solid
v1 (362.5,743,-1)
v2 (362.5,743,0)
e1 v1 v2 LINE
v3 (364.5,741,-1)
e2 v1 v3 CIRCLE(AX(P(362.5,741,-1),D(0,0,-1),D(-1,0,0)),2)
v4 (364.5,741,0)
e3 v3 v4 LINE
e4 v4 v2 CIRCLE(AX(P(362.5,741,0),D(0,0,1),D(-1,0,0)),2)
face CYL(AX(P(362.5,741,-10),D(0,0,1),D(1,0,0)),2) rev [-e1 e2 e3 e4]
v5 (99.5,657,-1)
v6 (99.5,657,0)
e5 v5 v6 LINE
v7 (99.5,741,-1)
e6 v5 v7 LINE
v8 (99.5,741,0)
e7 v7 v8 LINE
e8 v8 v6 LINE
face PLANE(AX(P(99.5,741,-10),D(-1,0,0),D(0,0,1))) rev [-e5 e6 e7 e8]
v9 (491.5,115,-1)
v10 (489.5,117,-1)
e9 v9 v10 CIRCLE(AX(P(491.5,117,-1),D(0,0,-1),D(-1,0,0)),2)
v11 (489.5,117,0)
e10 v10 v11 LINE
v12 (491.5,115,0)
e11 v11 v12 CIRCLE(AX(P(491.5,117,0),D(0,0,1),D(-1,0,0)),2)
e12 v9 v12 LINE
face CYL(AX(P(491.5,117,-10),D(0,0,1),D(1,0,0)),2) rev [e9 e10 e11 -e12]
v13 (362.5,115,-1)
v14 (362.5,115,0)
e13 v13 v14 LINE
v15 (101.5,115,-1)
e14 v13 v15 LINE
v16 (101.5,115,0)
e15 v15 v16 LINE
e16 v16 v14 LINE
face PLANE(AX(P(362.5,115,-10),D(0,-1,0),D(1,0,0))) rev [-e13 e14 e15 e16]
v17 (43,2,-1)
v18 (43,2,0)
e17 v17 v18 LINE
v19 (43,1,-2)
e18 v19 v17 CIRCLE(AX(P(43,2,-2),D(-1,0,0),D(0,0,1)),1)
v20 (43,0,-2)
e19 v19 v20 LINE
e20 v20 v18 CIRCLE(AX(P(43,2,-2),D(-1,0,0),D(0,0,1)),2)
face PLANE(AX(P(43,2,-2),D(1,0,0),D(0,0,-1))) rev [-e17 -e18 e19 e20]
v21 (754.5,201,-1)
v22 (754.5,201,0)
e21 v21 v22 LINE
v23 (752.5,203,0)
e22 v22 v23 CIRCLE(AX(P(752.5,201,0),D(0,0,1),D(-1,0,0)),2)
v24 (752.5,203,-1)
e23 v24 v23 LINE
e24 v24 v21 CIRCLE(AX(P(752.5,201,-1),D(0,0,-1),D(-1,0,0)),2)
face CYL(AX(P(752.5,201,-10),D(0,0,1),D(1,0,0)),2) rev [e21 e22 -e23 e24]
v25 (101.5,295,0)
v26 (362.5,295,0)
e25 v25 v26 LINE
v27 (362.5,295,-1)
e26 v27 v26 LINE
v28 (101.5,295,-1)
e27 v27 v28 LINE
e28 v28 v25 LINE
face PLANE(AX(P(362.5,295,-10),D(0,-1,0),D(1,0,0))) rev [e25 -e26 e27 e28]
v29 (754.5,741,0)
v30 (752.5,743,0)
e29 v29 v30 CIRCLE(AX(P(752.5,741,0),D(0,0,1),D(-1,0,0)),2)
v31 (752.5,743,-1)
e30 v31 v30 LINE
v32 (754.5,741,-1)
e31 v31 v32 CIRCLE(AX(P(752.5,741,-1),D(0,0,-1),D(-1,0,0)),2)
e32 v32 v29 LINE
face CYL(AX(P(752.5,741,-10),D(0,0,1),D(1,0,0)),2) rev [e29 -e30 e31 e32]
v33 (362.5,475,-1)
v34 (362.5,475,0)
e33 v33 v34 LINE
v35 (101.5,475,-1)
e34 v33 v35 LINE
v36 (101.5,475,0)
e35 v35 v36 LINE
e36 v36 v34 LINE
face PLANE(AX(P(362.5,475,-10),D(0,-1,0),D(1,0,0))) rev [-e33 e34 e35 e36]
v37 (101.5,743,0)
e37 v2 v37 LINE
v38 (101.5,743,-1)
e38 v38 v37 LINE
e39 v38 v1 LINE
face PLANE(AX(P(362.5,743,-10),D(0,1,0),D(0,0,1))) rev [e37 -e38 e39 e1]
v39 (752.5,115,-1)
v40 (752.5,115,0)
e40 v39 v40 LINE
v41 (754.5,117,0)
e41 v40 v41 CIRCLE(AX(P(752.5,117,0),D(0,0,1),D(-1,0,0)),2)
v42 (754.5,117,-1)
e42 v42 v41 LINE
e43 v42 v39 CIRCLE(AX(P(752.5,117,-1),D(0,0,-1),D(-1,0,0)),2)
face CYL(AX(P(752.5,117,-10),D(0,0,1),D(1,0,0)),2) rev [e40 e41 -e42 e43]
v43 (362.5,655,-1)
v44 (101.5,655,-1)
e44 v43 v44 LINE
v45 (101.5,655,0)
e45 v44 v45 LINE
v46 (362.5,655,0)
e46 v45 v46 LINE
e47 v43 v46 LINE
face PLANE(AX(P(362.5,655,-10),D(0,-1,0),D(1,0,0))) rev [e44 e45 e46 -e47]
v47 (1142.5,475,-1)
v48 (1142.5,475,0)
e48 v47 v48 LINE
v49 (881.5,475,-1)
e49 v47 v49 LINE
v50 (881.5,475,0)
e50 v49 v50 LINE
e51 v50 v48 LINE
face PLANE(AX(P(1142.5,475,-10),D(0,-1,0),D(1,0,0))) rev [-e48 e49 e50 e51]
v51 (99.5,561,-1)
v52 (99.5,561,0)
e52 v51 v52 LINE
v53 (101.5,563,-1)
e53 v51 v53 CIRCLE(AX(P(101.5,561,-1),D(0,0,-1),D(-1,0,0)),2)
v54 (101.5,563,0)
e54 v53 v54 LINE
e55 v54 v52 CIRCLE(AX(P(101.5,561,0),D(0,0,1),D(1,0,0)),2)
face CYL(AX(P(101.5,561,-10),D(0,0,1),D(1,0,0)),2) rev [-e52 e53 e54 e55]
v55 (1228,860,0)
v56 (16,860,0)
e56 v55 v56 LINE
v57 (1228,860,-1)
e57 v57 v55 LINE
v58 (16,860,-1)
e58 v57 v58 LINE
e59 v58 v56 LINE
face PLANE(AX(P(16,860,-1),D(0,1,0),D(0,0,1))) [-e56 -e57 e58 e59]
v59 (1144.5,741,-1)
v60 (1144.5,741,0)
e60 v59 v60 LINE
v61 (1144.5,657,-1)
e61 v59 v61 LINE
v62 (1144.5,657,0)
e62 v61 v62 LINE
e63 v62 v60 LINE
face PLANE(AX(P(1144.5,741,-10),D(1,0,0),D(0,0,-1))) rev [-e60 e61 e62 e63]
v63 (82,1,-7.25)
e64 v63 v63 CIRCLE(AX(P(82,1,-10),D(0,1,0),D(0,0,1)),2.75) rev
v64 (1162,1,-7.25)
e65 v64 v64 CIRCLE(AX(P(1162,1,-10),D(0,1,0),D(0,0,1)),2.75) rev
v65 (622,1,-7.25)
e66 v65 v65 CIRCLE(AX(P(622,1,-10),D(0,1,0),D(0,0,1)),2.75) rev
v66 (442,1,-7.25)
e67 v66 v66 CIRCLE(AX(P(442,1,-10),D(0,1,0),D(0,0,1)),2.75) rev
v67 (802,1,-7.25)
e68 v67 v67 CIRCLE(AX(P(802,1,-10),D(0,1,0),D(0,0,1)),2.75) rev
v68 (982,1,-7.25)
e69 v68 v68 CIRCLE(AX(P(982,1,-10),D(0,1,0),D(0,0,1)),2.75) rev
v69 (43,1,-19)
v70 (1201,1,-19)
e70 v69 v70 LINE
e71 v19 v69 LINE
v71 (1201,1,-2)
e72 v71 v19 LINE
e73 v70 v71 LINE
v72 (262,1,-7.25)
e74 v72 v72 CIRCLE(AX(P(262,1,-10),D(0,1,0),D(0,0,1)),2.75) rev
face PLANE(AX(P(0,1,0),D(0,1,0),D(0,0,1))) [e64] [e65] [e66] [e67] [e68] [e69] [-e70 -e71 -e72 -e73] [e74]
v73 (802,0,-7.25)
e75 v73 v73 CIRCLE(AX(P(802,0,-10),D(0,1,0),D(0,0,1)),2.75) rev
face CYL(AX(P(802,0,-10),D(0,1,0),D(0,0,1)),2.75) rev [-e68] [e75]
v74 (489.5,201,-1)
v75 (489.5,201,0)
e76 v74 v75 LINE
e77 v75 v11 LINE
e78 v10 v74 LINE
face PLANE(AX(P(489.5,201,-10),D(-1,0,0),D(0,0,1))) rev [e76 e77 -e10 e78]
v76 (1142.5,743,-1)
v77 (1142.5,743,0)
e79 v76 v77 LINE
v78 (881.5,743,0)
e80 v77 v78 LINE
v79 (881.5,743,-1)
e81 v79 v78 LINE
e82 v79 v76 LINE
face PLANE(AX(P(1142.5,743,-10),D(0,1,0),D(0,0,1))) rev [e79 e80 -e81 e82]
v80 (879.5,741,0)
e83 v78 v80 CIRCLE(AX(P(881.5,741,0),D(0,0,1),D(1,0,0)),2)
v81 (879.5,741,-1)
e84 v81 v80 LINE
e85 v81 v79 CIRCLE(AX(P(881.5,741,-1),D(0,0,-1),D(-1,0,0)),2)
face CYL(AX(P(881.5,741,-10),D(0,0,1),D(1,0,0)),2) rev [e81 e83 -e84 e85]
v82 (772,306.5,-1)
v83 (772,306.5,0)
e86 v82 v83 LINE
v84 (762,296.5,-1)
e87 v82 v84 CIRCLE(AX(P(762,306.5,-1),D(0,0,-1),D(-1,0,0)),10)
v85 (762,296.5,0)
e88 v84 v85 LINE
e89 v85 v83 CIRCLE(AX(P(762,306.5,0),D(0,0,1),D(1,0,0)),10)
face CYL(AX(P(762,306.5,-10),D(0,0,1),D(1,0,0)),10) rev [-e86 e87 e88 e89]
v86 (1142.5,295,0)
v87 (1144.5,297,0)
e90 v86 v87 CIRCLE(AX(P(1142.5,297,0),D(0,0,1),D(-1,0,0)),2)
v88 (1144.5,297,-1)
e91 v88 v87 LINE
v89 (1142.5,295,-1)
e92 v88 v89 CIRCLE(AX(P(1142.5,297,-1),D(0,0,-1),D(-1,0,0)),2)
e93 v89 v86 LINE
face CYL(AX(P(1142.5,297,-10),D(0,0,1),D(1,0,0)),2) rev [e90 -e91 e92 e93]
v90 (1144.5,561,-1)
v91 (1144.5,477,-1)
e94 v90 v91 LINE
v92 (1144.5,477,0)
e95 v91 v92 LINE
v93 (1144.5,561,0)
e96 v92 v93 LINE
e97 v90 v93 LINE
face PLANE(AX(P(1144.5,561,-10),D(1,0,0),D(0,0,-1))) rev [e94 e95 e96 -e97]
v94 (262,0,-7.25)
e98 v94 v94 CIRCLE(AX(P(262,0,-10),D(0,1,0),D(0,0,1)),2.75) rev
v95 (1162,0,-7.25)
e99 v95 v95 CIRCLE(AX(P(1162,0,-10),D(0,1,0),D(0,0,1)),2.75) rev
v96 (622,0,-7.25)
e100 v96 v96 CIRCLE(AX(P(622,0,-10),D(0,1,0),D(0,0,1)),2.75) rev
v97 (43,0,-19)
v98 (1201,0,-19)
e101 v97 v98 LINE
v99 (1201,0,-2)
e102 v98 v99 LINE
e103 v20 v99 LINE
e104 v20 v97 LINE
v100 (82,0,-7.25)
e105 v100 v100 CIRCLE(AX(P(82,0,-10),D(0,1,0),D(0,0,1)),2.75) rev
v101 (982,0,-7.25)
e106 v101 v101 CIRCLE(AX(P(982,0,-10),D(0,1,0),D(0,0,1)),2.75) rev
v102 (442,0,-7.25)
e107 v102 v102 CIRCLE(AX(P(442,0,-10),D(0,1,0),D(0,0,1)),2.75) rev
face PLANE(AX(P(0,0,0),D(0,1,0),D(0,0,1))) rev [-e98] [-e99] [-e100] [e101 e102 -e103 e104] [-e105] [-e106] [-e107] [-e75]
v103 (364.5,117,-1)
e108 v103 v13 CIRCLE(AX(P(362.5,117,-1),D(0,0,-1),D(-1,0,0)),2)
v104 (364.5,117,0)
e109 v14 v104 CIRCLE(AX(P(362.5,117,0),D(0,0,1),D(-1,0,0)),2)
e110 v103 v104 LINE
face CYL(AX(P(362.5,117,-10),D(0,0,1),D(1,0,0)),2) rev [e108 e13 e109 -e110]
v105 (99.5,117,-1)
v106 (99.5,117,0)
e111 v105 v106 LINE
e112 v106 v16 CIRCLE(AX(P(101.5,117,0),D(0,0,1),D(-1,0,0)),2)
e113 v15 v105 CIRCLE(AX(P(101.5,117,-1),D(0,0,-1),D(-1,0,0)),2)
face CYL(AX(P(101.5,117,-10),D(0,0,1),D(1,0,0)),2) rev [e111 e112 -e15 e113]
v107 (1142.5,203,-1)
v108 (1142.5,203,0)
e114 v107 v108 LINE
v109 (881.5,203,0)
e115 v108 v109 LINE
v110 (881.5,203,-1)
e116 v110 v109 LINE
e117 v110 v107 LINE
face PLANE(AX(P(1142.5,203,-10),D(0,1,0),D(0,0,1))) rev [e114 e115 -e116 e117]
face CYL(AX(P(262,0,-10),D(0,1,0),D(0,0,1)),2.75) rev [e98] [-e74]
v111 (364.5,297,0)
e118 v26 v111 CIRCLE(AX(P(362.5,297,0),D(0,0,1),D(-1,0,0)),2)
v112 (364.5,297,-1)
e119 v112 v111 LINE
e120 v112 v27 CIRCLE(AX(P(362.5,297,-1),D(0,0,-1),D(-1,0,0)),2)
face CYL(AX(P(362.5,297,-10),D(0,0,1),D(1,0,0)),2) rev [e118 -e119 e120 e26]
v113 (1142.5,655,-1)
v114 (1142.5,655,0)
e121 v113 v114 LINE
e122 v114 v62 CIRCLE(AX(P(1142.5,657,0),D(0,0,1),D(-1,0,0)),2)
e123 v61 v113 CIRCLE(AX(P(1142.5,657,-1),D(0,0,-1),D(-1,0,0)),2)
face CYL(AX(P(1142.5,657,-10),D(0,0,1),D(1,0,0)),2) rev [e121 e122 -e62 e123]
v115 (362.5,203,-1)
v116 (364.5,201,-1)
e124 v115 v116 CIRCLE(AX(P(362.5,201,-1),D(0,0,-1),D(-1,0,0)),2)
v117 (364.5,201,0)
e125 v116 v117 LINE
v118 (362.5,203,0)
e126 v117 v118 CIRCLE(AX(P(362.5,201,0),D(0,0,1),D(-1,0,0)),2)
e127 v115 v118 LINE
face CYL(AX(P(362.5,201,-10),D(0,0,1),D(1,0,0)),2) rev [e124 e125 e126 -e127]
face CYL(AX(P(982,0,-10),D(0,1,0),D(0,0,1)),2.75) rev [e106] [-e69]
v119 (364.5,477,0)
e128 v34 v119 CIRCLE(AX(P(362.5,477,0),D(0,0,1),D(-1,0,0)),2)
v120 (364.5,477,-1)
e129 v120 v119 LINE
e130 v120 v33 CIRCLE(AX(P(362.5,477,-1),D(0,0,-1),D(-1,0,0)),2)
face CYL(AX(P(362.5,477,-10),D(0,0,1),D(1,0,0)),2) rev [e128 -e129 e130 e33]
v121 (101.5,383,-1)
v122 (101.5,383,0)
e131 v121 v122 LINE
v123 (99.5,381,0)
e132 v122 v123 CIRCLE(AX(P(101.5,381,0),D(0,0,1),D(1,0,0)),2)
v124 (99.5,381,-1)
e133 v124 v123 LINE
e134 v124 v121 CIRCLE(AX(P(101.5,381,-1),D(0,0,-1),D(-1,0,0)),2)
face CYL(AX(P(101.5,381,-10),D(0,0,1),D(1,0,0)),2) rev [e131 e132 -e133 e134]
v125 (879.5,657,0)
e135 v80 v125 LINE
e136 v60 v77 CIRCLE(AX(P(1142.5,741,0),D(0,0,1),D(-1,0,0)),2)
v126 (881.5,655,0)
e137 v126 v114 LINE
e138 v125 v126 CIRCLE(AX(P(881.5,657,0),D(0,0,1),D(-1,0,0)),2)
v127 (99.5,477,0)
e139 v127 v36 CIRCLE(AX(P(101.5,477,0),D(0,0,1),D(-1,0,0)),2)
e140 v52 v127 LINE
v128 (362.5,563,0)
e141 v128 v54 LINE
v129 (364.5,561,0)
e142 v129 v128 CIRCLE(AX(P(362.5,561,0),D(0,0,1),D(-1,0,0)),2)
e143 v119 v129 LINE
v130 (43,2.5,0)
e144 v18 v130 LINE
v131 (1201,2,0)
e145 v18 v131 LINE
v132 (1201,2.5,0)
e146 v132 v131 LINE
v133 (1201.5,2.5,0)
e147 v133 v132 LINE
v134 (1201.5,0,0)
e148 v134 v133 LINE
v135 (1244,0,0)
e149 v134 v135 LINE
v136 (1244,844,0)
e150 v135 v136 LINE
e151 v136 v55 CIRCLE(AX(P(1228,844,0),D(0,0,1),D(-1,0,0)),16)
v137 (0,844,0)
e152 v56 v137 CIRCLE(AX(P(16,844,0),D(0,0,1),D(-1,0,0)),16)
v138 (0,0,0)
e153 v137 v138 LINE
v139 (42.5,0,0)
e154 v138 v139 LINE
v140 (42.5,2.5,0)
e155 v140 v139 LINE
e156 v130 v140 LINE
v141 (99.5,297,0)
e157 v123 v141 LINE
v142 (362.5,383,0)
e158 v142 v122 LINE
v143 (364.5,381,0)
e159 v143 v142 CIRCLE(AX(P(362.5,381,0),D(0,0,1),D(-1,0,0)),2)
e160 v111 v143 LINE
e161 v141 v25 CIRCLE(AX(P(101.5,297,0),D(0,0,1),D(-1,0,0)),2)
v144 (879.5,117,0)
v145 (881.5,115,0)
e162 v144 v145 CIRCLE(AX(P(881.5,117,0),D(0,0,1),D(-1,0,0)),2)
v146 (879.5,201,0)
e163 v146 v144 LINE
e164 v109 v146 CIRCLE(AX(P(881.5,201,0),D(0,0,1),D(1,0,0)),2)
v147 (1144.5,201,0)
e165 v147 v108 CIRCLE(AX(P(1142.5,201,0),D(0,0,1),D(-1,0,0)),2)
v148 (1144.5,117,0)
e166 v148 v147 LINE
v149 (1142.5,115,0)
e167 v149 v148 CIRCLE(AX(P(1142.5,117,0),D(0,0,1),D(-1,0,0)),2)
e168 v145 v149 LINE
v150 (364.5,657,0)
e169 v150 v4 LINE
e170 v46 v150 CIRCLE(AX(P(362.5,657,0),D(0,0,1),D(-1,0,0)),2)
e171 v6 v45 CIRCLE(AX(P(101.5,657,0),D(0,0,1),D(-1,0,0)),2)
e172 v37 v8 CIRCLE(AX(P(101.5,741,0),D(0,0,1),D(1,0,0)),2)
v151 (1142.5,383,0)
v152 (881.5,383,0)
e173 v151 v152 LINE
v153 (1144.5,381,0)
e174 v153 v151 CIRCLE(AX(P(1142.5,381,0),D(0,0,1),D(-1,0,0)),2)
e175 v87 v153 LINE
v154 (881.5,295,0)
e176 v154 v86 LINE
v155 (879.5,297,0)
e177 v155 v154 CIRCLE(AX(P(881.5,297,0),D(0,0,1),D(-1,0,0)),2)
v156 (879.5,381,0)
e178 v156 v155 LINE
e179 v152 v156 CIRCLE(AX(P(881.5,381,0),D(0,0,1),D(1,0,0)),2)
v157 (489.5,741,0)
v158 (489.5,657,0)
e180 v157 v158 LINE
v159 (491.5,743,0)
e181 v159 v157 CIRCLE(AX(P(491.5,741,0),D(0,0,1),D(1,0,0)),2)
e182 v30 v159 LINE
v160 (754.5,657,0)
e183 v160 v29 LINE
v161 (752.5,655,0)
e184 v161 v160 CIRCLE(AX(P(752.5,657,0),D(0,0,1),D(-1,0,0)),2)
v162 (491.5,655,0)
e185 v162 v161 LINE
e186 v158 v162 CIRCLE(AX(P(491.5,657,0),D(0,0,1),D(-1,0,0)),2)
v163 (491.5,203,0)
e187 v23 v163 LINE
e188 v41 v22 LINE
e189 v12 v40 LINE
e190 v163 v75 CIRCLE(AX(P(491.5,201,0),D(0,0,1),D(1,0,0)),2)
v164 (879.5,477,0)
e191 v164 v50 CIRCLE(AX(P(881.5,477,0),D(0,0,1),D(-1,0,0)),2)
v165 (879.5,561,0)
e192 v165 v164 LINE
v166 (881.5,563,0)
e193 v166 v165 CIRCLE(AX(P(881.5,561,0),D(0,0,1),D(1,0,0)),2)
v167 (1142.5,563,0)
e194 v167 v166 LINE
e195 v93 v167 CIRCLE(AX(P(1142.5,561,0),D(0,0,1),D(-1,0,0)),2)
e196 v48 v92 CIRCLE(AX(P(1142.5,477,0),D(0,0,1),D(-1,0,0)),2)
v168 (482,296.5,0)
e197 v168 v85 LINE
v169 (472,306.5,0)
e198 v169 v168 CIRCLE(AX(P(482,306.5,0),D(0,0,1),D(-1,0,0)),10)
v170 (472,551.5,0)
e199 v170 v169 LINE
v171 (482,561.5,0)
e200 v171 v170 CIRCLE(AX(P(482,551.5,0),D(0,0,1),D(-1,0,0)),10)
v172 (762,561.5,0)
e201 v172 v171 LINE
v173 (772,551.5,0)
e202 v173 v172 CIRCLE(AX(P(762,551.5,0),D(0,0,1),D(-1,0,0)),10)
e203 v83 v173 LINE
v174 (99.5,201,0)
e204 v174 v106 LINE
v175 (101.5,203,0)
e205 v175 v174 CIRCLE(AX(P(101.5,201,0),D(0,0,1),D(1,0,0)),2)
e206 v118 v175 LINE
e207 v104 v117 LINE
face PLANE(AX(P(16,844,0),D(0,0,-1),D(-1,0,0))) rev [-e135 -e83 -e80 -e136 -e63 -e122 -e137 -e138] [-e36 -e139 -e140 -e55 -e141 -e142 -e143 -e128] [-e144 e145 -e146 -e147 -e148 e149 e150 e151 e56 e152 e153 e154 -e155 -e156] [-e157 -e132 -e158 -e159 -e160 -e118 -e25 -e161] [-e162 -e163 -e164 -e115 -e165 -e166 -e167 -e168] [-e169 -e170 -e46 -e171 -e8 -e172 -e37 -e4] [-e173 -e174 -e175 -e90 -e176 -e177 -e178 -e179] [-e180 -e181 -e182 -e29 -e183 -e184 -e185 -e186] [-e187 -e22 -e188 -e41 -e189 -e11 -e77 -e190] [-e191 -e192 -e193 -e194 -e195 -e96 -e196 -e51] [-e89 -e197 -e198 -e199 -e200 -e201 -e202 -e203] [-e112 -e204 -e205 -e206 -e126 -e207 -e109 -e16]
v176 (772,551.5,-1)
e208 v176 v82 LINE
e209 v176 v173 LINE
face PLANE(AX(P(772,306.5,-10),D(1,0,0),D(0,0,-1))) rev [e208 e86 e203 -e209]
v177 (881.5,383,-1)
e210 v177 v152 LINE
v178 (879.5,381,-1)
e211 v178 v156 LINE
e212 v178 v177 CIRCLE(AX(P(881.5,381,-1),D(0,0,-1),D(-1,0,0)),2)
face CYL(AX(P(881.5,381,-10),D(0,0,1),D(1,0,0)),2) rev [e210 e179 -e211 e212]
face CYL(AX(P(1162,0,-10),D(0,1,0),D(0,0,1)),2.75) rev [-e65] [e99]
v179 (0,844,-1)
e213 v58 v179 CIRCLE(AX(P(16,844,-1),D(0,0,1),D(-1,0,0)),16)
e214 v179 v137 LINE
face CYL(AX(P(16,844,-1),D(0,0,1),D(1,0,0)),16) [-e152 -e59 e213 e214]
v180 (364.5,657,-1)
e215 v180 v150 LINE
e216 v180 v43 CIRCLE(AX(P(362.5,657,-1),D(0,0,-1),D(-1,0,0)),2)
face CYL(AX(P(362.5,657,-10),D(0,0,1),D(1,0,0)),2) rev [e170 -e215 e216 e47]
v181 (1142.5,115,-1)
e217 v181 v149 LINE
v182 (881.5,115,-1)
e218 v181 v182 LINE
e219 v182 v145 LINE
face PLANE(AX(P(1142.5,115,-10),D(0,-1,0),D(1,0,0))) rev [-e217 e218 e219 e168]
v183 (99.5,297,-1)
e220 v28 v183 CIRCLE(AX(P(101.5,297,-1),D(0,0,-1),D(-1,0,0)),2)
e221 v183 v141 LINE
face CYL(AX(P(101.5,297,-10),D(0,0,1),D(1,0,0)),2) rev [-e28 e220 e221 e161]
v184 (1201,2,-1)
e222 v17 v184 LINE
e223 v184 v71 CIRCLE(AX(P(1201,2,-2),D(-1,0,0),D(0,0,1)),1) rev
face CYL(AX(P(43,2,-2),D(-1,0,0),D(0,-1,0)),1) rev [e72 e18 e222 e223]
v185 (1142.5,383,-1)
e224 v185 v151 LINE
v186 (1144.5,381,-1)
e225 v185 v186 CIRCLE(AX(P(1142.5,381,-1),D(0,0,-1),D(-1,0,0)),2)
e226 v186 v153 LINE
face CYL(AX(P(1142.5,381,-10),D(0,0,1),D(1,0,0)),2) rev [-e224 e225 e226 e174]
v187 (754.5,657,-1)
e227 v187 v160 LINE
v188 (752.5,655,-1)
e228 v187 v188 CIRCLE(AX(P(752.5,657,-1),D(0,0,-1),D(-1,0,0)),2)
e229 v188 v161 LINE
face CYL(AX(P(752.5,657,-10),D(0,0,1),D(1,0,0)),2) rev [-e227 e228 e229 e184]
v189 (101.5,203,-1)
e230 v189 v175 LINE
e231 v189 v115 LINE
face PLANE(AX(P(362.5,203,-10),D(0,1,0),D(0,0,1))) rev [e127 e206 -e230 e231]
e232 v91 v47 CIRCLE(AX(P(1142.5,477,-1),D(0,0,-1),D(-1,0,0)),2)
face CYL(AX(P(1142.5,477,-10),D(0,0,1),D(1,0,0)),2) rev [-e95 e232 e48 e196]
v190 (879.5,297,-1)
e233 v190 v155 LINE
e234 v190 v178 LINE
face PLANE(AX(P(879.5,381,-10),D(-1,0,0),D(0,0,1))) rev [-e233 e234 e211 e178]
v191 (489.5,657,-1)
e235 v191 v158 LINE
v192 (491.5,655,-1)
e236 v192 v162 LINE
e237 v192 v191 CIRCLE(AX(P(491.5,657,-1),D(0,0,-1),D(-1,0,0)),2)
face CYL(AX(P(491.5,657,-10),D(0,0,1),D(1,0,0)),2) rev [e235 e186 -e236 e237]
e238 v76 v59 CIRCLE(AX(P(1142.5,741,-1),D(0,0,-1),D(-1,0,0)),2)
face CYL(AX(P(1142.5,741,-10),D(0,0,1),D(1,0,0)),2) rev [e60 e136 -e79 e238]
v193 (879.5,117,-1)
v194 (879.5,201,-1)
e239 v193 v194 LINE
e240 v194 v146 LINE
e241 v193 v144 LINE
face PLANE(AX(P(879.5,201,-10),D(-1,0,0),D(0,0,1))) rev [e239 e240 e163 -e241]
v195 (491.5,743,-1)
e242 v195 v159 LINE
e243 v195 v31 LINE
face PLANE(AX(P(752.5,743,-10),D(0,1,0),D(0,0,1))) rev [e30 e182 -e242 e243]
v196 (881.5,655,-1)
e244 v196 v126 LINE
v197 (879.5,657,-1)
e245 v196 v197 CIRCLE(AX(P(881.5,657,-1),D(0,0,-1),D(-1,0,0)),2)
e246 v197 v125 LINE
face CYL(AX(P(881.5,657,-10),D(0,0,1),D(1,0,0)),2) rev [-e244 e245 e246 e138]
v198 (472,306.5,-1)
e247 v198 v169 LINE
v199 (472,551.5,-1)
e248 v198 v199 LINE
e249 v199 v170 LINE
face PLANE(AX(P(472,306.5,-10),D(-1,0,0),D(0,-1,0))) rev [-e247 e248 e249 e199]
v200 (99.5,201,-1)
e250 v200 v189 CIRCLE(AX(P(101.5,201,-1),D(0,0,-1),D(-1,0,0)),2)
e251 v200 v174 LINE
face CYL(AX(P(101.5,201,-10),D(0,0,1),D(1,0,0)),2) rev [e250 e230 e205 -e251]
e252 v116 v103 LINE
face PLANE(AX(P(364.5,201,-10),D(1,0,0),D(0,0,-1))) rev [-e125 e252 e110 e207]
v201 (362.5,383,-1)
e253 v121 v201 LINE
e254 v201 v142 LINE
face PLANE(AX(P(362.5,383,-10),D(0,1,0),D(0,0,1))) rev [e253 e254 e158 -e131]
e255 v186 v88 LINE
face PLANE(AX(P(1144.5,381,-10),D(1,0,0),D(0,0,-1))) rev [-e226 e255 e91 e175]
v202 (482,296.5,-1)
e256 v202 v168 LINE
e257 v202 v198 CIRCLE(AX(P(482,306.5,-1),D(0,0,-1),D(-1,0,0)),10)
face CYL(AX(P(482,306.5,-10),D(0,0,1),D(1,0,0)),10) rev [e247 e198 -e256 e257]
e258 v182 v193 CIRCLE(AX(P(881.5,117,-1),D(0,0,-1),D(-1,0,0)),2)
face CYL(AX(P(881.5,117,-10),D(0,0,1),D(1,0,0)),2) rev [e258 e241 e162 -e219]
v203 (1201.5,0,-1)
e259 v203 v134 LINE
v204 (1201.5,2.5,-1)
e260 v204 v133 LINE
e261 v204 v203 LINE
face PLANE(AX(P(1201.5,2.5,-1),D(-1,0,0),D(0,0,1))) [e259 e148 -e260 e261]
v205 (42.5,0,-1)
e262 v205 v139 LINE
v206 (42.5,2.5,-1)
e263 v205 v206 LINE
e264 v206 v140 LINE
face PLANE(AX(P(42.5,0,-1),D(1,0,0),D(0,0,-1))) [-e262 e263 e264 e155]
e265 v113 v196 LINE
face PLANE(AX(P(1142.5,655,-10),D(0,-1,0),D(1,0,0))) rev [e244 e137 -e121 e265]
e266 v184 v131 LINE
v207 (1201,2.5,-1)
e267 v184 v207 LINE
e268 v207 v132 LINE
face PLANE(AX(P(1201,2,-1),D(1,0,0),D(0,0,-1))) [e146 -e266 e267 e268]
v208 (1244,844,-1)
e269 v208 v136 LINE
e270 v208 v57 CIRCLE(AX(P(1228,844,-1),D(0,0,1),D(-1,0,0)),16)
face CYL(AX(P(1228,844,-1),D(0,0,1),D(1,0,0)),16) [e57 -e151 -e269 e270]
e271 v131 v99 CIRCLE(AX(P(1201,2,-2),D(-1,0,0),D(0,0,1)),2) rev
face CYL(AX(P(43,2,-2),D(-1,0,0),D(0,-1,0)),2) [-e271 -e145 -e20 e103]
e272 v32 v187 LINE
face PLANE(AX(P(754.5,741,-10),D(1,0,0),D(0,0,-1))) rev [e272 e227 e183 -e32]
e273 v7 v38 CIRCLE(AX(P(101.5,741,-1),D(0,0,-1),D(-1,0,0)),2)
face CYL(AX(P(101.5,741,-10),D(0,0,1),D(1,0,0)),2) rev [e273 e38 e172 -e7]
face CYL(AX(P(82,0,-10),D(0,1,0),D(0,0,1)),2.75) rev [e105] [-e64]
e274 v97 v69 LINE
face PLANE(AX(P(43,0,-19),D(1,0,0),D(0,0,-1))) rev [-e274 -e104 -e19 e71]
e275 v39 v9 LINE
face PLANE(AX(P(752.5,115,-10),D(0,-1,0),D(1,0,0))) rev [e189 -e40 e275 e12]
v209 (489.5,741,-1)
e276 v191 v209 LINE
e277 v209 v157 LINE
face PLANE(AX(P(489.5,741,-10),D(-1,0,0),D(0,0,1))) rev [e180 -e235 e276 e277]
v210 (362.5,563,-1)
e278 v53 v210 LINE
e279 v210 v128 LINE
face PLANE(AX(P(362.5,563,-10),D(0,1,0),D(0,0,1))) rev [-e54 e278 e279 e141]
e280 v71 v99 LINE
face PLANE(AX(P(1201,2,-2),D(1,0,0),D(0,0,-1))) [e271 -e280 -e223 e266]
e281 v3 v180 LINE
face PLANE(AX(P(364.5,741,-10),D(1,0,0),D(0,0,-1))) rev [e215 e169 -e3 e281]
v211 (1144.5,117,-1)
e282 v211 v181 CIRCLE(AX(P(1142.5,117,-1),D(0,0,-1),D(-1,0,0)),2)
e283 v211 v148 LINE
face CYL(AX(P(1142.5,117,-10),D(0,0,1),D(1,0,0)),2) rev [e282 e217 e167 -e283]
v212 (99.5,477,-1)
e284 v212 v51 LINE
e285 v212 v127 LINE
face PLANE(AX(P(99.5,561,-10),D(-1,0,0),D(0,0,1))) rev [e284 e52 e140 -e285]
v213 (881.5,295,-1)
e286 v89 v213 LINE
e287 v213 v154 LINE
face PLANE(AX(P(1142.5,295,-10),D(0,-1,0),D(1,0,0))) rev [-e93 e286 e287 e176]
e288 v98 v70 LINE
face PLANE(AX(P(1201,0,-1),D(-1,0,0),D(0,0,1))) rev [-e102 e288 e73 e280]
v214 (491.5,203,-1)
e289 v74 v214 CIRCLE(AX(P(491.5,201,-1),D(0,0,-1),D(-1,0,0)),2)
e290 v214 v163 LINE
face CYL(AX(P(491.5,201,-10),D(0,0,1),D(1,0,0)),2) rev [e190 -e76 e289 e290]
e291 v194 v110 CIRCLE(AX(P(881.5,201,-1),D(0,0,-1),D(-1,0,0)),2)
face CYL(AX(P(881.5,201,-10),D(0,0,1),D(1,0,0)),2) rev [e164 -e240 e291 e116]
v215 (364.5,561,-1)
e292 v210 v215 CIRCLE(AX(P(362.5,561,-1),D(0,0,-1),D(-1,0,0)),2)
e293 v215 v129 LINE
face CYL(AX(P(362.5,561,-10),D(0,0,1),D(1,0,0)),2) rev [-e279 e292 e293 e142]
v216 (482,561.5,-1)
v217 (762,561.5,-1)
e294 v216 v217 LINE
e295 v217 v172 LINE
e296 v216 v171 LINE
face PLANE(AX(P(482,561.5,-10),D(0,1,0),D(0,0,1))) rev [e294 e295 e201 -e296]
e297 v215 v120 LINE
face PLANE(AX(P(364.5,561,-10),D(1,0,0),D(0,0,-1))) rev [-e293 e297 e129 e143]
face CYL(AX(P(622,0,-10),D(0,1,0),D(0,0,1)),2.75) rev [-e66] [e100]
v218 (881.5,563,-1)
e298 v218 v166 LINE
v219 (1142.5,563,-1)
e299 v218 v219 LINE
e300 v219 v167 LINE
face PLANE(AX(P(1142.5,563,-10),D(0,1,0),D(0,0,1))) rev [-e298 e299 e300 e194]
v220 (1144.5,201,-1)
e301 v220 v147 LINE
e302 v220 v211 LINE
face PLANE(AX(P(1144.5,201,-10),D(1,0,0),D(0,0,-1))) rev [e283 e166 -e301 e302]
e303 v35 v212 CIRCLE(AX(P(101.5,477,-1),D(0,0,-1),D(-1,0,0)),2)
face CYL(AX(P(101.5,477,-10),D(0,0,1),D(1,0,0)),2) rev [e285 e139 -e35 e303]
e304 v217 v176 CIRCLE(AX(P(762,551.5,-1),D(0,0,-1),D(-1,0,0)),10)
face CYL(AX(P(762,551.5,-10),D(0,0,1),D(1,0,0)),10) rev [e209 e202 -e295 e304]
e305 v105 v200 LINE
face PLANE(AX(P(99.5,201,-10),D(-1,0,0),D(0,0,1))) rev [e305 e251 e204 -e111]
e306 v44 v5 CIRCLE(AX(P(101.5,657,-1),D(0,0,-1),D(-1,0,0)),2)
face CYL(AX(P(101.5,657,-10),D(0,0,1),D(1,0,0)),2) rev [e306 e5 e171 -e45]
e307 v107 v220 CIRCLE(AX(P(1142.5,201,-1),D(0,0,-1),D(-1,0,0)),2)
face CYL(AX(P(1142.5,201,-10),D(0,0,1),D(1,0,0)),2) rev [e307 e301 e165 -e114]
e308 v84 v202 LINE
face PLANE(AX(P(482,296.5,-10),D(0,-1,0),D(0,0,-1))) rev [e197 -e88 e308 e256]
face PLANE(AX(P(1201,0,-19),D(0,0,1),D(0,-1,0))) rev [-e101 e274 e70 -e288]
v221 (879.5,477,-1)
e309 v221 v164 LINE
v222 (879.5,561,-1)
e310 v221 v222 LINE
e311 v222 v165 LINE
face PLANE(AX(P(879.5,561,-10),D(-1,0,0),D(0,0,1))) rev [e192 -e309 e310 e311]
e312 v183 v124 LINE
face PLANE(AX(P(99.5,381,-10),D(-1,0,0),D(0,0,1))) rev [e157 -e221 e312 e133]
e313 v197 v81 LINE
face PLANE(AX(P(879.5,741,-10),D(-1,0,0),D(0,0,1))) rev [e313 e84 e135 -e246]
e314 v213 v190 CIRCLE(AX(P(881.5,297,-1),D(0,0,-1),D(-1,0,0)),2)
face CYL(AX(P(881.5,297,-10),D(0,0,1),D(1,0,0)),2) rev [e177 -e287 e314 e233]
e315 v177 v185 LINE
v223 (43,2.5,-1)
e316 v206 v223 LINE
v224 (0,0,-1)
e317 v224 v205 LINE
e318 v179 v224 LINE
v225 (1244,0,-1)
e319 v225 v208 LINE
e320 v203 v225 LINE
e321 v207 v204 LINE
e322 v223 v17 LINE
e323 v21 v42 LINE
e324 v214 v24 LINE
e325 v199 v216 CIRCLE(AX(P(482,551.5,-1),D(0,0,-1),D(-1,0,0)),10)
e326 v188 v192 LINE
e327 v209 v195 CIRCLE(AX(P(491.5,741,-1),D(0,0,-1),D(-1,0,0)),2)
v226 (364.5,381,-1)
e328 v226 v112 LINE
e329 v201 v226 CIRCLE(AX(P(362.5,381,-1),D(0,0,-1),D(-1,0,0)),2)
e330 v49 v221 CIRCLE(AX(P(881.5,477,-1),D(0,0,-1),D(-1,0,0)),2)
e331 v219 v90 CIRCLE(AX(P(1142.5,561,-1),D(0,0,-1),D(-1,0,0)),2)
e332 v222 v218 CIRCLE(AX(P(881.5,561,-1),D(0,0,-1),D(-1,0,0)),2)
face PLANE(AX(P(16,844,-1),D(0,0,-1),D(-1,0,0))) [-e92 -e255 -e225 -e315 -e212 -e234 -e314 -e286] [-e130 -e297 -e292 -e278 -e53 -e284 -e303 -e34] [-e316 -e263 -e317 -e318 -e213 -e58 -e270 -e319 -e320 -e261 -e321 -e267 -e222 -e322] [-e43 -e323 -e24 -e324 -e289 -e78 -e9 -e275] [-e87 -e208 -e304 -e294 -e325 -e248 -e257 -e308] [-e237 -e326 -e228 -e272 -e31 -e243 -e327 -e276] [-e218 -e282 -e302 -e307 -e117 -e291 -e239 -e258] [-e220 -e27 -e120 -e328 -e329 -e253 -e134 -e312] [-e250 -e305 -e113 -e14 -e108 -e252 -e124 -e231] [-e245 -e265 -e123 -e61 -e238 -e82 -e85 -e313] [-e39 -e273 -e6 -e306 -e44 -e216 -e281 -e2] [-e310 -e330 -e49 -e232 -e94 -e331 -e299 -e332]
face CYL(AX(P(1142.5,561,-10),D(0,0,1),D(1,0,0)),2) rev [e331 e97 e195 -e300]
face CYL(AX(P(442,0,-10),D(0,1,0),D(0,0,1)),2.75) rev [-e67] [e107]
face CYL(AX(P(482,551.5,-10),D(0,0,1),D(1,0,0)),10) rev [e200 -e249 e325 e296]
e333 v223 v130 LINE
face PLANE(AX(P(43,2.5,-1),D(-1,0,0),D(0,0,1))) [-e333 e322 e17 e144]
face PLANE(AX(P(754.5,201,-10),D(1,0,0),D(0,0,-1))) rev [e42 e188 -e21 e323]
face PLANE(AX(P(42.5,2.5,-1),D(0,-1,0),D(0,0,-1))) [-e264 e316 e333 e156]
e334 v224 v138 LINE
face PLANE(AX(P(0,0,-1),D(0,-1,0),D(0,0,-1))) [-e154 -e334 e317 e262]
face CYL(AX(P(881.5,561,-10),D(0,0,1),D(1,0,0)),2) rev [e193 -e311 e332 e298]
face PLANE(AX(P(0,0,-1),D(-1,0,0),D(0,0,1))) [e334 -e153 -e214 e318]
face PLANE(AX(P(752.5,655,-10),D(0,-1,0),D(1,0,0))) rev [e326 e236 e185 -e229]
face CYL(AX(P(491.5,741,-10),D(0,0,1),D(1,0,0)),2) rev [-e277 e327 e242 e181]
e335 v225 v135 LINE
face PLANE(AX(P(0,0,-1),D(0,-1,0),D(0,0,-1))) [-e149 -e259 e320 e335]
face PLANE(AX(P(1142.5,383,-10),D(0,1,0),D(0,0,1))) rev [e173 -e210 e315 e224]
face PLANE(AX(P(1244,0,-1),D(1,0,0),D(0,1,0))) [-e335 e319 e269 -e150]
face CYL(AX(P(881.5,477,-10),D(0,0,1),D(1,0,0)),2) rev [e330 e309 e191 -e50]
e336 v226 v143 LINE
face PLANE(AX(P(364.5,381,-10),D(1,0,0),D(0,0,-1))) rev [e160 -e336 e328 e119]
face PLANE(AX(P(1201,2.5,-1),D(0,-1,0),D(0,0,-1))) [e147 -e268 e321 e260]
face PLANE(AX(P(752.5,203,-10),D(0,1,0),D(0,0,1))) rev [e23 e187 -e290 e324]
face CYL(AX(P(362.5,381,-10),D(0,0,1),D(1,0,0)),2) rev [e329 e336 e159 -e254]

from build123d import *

# Parameters (mm, degrees)
BASE_FLANGE1_DEPTH            = 1
EDGE_FLANGE1_STRIP_W          = 6
EDGE_FLANGE1_STRIP_H          = 1
EDGE_FLANGE1_STRIP_CUT_DEPTH  = 1158
EDGE_FLANGE1_RELIEF_W         = 6.5
EDGE_FLANGE1_RELIEF_H         = 0.5
EDGE_FLANGE1_RELIEF_CUT_DEPTH = 1
EDGE_FLANGE1_DEPTH            = 1158
EDGE_FLANGE1_PROFILE_W        = 1158
EDGE_FLANGE1_PROFILE_H        = 17
EDGE_FLANGE1_PROFILE_R        = 2.75
EDGE_FLANGE1_FLAT_DEPTH       = 1
CUT_EXTRUDE1_DEPTH            = 10
CUT_EXTRUDE2_DEPTH            = 10


# Sheet-metal steps are written as plain solids
with BuildPart() as part:
    # Sketch1 → Base-Flange1 (new body)
    with BuildSketch(Plane.XY):
        with BuildLine():
            Line((0, 0), (1244, 0))
            Line((1244, 0), (1244, 844))
            ThreePointArc((1244, 844), (1239.313708499, 855.313708499), (1228, 860))
            Line((1228, 860), (16, 860))
            ThreePointArc((16, 860), (4.686291501, 855.313708499), (0, 844))
            Line((0, 844), (0, 0))
        make_face()
    extrude(amount=-BASE_FLANGE1_DEPTH)

    # Edge-Flange1 strip (across the edge) → Edge-Flange1 strip cut (cut)
    with BuildSketch(Plane(origin=(1201, 0, -1), x_dir=(0, 1, 0), z_dir=(-1, 0, 0))):
        with Locations((-1, -0.5)):
            Rectangle(EDGE_FLANGE1_STRIP_W, EDGE_FLANGE1_STRIP_H)
    extrude(amount=EDGE_FLANGE1_STRIP_CUT_DEPTH, mode=Mode.SUBTRACT)

    # Edge-Flange1 relief (on the sheet) → Edge-Flange1 relief cut (cut)
    with BuildSketch(Plane(origin=(1201, 2, -1), x_dir=(0, 1, 0), z_dir=(0, 0, -1))):
        with Locations((-2.75, 0.25)):
            Rectangle(EDGE_FLANGE1_RELIEF_W, EDGE_FLANGE1_RELIEF_H)
        with Locations((-2.75, -1158.25)):
            Rectangle(EDGE_FLANGE1_RELIEF_W, EDGE_FLANGE1_RELIEF_H)
    extrude(amount=-EDGE_FLANGE1_RELIEF_CUT_DEPTH, mode=Mode.SUBTRACT)

    # Edge-Flange1 bend section (across the edge) → Edge-Flange1 (add)
    with BuildSketch(Plane(origin=(1201, 0, -1), x_dir=(0, 1, 0), z_dir=(-1, 0, 0))):
        with BuildLine():
            Line((0, 1), (1, 1))
            ThreePointArc((1, 1), (1.292893219, 0.292893219), (2, 0))
            Line((2, 0), (2, -1))
            ThreePointArc((2, -1), (0.585786438, -0.414213562), (0, 1))
        make_face()
    extrude(amount=EDGE_FLANGE1_DEPTH)

    # Edge-Flange1 profile (on flange) → Edge-Flange1 flat (add)
    with BuildSketch(Plane(origin=(0, 0, -1), x_dir=(-1, 0, 0), z_dir=(0, -1, 0))):
        with Locations((-622, 9.5)):
            Rectangle(EDGE_FLANGE1_PROFILE_W, EDGE_FLANGE1_PROFILE_H)
        with Locations((-622, 9)):
            Circle(EDGE_FLANGE1_PROFILE_R, mode=Mode.SUBTRACT)
        with Locations((-802, 9)):
            Circle(EDGE_FLANGE1_PROFILE_R, mode=Mode.SUBTRACT)
        with Locations((-982, 9)):
            Circle(EDGE_FLANGE1_PROFILE_R, mode=Mode.SUBTRACT)
        with Locations((-1162, 9)):
            Circle(EDGE_FLANGE1_PROFILE_R, mode=Mode.SUBTRACT)
        with Locations((-82, 9)):
            Circle(EDGE_FLANGE1_PROFILE_R, mode=Mode.SUBTRACT)
        with Locations((-262, 9)):
            Circle(EDGE_FLANGE1_PROFILE_R, mode=Mode.SUBTRACT)
        with Locations((-442, 9)):
            Circle(EDGE_FLANGE1_PROFILE_R, mode=Mode.SUBTRACT)
    extrude(amount=-EDGE_FLANGE1_FLAT_DEPTH)

    # Sketch9 → Cut-Extrude1 (cut)
    with BuildSketch(Plane.XY):
        with BuildLine():
            Line((1142.5, 743), (881.5, 743))
            ThreePointArc((881.5, 743), (880.085786438, 742.414213562), (879.5, 741))
            Line((879.5, 741), (879.5, 657))
            ThreePointArc((879.5, 657), (880.085786438, 655.585786438), (881.5, 655))
            Line((881.5, 655), (1142.5, 655))
            ThreePointArc((1142.5, 655), (1143.914213562, 655.585786438), (1144.5, 657))
            Line((1144.5, 657), (1144.5, 741))
            ThreePointArc((1144.5, 741), (1143.914213562, 742.414213562), (1142.5, 743))
        make_face()
        with BuildLine():
            Line((754.5, 741), (754.5, 657))
            ThreePointArc((754.5, 657), (753.914213562, 655.585786438), (752.5, 655))
            Line((752.5, 655), (491.5, 655))
            ThreePointArc((491.5, 655), (490.085786438, 655.585786438), (489.5, 657))
            Line((489.5, 657), (489.5, 741))
            ThreePointArc((489.5, 741), (490.085786438, 742.414213562), (491.5, 743))
            Line((491.5, 743), (752.5, 743))
            ThreePointArc((752.5, 743), (753.914213562, 742.414213562), (754.5, 741))
        make_face()
        with BuildLine():
            Line((364.5, 741), (364.5, 657))
            ThreePointArc((364.5, 657), (363.914213562, 655.585786438), (362.5, 655))
            Line((362.5, 655), (101.5, 655))
            ThreePointArc((101.5, 655), (100.085786438, 655.585786438), (99.5, 657))
            Line((99.5, 657), (99.5, 741))
            ThreePointArc((99.5, 741), (100.085786438, 742.414213562), (101.5, 743))
            Line((101.5, 743), (362.5, 743))
            ThreePointArc((362.5, 743), (363.914213562, 742.414213562), (364.5, 741))
        make_face()
        with BuildLine():
            Line((364.5, 561), (364.5, 477))
            ThreePointArc((364.5, 477), (363.914213562, 475.585786438), (362.5, 475))
            Line((362.5, 475), (101.5, 475))
            ThreePointArc((101.5, 475), (100.085786438, 475.585786438), (99.5, 477))
            Line((99.5, 477), (99.5, 561))
            ThreePointArc((99.5, 561), (100.085786438, 562.414213562), (101.5, 563))
            Line((101.5, 563), (362.5, 563))
            ThreePointArc((362.5, 563), (363.914213562, 562.414213562), (364.5, 561))
        make_face()
        with BuildLine():
            Line((364.5, 381), (364.5, 297))
            ThreePointArc((364.5, 297), (363.914213562, 295.585786438), (362.5, 295))
            Line((362.5, 295), (101.5, 295))
            ThreePointArc((101.5, 295), (100.085786438, 295.585786438), (99.5, 297))
            Line((99.5, 297), (99.5, 381))
            ThreePointArc((99.5, 381), (100.085786438, 382.414213562), (101.5, 383))
            Line((101.5, 383), (362.5, 383))
            ThreePointArc((362.5, 383), (363.914213562, 382.414213562), (364.5, 381))
        make_face()
        with BuildLine():
            Line((754.5, 201), (754.5, 117))
            ThreePointArc((754.5, 117), (753.914213562, 115.585786438), (752.5, 115))
            Line((752.5, 115), (491.5, 115))
            ThreePointArc((491.5, 115), (490.085786438, 115.585786438), (489.5, 117))
            Line((489.5, 117), (489.5, 201))
            ThreePointArc((489.5, 201), (490.085786438, 202.414213562), (491.5, 203))
            Line((491.5, 203), (752.5, 203))
            ThreePointArc((752.5, 203), (753.914213562, 202.414213562), (754.5, 201))
        make_face()
        with BuildLine():
            Line((364.5, 201), (364.5, 117))
            ThreePointArc((364.5, 117), (363.914213562, 115.585786438), (362.5, 115))
            Line((362.5, 115), (101.5, 115))
            ThreePointArc((101.5, 115), (100.085786438, 115.585786438), (99.5, 117))
            Line((99.5, 117), (99.5, 201))
            ThreePointArc((99.5, 201), (100.085786438, 202.414213562), (101.5, 203))
            Line((101.5, 203), (362.5, 203))
            ThreePointArc((362.5, 203), (363.914213562, 202.414213562), (364.5, 201))
        make_face()
        with BuildLine():
            Line((1144.5, 561), (1144.5, 477))
            ThreePointArc((1144.5, 477), (1143.914213562, 475.585786438), (1142.5, 475))
            Line((1142.5, 475), (881.5, 475))
            ThreePointArc((881.5, 475), (880.085786438, 475.585786438), (879.5, 477))
            Line((879.5, 477), (879.5, 561))
            ThreePointArc((879.5, 561), (880.085786438, 562.414213562), (881.5, 563))
            Line((881.5, 563), (1142.5, 563))
            ThreePointArc((1142.5, 563), (1143.914213562, 562.414213562), (1144.5, 561))
        make_face()
        with BuildLine():
            Line((1144.5, 381), (1144.5, 297))
            ThreePointArc((1144.5, 297), (1143.914213562, 295.585786438), (1142.5, 295))
            Line((1142.5, 295), (881.5, 295))
            ThreePointArc((881.5, 295), (880.085786438, 295.585786438), (879.5, 297))
            Line((879.5, 297), (879.5, 381))
            ThreePointArc((879.5, 381), (880.085786438, 382.414213562), (881.5, 383))
            Line((881.5, 383), (1142.5, 383))
            ThreePointArc((1142.5, 383), (1143.914213562, 382.414213562), (1144.5, 381))
        make_face()
        with BuildLine():
            Line((1144.5, 201), (1144.5, 117))
            ThreePointArc((1144.5, 117), (1143.914213562, 115.585786438), (1142.5, 115))
            Line((1142.5, 115), (881.5, 115))
            ThreePointArc((881.5, 115), (880.085786438, 115.585786438), (879.5, 117))
            Line((879.5, 117), (879.5, 201))
            ThreePointArc((879.5, 201), (880.085786438, 202.414213562), (881.5, 203))
            Line((881.5, 203), (1142.5, 203))
            ThreePointArc((1142.5, 203), (1143.914213562, 202.414213562), (1144.5, 201))
        make_face()
    extrude(amount=-CUT_EXTRUDE1_DEPTH, mode=Mode.SUBTRACT)

    # Sketch10 → Cut-Extrude2 (cut)
    with BuildSketch(Plane.XY):
        with BuildLine():
            Line((482, 296.5), (762, 296.5))
            ThreePointArc((762, 296.5), (769.071067812, 299.428932188), (772, 306.5))
            Line((772, 306.5), (772, 551.5))
            ThreePointArc((772, 551.5), (769.071067812, 558.571067812), (762, 561.5))
            Line((762, 561.5), (482, 561.5))
            ThreePointArc((482, 561.5), (474.928932188, 558.571067812), (472, 551.5))
            Line((472, 551.5), (472, 306.5))
            ThreePointArc((472, 306.5), (474.928932188, 299.428932188), (482, 296.5))
        make_face()
    extrude(amount=-CUT_EXTRUDE2_DEPTH, mode=Mode.SUBTRACT)


solid = part.part
